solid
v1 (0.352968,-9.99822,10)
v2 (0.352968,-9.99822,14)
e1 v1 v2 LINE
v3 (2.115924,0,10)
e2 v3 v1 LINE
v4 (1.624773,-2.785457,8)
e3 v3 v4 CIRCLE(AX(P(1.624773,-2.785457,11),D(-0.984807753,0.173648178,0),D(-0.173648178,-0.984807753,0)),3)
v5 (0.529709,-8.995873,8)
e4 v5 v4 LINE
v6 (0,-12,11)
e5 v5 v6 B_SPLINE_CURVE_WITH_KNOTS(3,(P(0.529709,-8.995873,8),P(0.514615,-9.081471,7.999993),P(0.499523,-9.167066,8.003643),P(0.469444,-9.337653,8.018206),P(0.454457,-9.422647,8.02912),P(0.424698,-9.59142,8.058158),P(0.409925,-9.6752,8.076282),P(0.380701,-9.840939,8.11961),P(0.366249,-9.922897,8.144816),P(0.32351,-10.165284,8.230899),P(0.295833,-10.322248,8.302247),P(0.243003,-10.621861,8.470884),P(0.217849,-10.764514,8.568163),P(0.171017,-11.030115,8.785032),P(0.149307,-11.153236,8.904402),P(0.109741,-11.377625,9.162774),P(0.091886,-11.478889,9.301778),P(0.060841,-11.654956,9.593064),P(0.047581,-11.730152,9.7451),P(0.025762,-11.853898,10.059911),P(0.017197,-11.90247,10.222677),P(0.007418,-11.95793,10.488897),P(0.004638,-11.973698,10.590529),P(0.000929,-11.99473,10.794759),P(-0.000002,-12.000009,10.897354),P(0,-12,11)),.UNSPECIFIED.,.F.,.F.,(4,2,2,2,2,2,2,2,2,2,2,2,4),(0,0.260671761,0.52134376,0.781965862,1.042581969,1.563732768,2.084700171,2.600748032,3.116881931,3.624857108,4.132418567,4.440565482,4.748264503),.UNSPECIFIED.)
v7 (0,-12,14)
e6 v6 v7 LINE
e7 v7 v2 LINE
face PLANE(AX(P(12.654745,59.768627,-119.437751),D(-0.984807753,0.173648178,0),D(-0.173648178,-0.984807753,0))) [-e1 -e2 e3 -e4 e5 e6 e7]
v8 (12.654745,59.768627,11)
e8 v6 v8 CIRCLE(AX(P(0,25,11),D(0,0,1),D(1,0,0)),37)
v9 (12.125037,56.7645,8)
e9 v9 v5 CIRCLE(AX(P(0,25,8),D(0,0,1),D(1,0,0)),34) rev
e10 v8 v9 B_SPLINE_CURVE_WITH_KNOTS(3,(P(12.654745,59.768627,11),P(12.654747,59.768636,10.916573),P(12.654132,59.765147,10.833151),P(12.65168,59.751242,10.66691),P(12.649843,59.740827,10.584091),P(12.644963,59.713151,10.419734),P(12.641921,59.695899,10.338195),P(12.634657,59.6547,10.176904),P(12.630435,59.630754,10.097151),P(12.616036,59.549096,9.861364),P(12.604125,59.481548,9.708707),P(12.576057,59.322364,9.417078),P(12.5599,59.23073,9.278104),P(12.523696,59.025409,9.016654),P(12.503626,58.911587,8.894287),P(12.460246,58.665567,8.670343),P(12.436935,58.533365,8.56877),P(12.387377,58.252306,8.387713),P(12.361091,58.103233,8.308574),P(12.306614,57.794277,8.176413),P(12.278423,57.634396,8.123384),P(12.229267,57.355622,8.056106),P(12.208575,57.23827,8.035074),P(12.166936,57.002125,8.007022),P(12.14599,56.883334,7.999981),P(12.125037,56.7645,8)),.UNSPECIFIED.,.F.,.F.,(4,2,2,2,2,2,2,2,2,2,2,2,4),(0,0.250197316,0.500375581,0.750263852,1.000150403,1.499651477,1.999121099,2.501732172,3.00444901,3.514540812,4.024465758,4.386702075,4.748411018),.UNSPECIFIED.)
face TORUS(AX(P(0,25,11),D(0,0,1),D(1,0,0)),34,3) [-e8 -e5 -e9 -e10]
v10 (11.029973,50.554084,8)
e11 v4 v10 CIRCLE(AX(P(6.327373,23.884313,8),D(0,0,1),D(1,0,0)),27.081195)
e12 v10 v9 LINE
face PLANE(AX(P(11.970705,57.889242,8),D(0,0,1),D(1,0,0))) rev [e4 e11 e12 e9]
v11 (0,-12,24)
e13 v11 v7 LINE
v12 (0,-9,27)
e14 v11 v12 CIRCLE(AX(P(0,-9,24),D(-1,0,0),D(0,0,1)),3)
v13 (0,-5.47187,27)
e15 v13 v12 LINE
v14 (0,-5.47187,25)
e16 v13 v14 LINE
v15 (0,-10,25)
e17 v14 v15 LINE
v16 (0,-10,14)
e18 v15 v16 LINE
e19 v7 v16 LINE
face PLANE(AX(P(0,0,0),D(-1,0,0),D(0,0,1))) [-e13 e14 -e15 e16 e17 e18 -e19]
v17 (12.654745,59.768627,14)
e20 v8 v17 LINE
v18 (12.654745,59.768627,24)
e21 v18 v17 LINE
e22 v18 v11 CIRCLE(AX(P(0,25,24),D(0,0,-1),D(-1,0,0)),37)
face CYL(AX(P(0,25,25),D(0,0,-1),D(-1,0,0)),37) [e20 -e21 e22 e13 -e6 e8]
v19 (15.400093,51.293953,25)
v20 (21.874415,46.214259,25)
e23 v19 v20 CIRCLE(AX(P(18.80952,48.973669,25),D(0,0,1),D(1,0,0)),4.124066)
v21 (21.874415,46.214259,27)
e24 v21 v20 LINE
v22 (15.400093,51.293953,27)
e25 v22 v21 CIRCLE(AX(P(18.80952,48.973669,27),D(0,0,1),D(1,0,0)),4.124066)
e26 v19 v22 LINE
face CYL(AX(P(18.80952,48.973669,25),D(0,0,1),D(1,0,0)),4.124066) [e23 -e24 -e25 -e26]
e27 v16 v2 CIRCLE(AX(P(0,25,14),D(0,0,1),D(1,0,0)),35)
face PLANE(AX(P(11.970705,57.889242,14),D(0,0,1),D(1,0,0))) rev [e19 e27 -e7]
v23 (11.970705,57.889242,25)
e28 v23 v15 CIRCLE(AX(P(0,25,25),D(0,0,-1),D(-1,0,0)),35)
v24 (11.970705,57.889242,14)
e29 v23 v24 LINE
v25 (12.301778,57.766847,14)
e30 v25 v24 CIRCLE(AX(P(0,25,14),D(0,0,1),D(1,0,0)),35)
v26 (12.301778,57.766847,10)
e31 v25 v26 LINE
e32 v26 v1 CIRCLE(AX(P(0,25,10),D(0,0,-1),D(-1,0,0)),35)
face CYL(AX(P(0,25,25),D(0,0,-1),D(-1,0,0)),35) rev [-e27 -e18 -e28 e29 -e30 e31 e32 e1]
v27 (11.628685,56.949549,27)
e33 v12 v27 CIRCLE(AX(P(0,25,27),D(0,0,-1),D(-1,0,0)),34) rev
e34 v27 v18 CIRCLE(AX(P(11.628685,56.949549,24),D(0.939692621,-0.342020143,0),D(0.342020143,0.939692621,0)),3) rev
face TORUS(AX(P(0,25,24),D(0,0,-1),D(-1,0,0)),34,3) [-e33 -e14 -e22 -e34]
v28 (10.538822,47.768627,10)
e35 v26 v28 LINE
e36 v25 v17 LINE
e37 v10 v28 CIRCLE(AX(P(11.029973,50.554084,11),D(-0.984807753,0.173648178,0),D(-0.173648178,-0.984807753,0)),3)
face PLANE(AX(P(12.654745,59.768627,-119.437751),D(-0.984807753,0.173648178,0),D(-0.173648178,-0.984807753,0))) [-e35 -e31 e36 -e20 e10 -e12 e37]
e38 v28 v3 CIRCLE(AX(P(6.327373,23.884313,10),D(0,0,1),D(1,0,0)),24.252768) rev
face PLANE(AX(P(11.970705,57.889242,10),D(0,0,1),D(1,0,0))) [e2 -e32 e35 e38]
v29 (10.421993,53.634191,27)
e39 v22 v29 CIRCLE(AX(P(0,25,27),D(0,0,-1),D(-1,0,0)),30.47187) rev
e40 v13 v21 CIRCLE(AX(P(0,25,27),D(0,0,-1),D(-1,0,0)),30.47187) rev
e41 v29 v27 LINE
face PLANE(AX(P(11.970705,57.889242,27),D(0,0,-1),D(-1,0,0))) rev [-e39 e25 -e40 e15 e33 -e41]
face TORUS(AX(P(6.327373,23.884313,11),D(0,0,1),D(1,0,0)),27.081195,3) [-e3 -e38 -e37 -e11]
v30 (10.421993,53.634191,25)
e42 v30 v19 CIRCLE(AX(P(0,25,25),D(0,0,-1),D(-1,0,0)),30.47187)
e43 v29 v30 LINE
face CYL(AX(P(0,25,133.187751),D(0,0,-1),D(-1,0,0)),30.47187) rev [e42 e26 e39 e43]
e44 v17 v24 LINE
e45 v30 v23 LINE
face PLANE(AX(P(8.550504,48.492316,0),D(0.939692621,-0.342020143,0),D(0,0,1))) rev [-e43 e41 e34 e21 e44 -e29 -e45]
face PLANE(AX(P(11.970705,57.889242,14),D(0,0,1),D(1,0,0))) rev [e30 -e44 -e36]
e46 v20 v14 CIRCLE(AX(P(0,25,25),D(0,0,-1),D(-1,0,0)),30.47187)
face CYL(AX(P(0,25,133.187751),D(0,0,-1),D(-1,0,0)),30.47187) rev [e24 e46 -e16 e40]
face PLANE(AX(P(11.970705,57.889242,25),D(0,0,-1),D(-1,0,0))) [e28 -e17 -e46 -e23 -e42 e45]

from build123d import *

# Parameters (mm, degrees)
SKETCH1_W                = 15
SKETCH1_H                = 35
REVOLVE1_ANGLE           = 160
SHELL1_T                 = 2
CUT_EXTRUDE4_DEPTH       = 73.816816531
CUT_EXTRUDE4_DEPTH_BACK  = 6
CUT_EXTRUDE5_DEPTH       = 73.816816531
CUT_EXTRUDE5_DEPTH_BACK  = 6
BOSS_EXTRUDE1_START      = -2
SKETCH9_R                = 4.124065783
BOSS_EXTRUDE1_DEPTH      = 2
FILLET4_R                = 3
FILLET5_R                = 3
CUT_EXTRUDE15_DEPTH      = 73.816816664
CUT_EXTRUDE15_DEPTH_BACK = 2
FILLET9_R                = 3


with BuildPart() as part:
    # Sketch1 → Revolve1 (revolve)
    with BuildSketch(Plane(origin=(0, 0, 0), x_dir=(0, 0, -1), z_dir=(1, 0, 0))):
        with Locations((-17.5, 7.5)):
            Rectangle(SKETCH1_W, SKETCH1_H)
    revolve(axis=Axis((0, 25, 25), (0, 0, 1)), revolution_arc=REVOLVE1_ANGLE)

    # Shell1
    shell1_openings = [part.faces().sort_by_distance(p)[0] for p in [
        (0, 7.5, 17.5),
        (5.985352508, 41.444620864, 17.5),
    ]]
    offset(amount=SHELL1_T, openings=shell1_openings, kind=Kind.INTERSECTION)

    # Sketch5 → Cut-Extrude4 (cut, two sides: drawn at the far end of the back side and taken through both)
    with BuildSketch(Plane.XY.offset(27).offset(-CUT_EXTRUDE4_DEPTH_BACK)):
        with BuildLine():
            Line((-139.932865383, 108.358884102), (10.421993206, 53.634190998))
            ThreePointArc((10.421993206, 53.634190998), (30.008933424, 19.708615375), (0, -5.471869593))
            Line((0, -5.471869593), (-160.004298494, -5.471869593))
            Line((-160.004298494, -5.471869593), (-475.151245838, 50.097040112))
            Line((-475.151245838, 50.097040112), (-455.079812728, 163.927793806))
            Line((-455.079812728, 163.927793806), (-139.932865383, 108.358884102))
        make_face()
    extrude(amount=CUT_EXTRUDE4_DEPTH + CUT_EXTRUDE4_DEPTH_BACK, mode=Mode.SUBTRACT)

    # Sketch7 → Cut-Extrude5 (cut, two sides: drawn at the far end of the back side and taken through both)
    with BuildSketch(Plane(origin=(0, 0, 8), x_dir=(-1, 0, 0), z_dir=(0, 0, -1)).offset(-CUT_EXTRUDE5_DEPTH_BACK)):
        Polygon((-42.433629983, 228.653074263), (-12.654745303, 59.768626969), (0, -12), (29.77888468, -180.884447294), (367.547779267, -121.326677934), (295.335264604, 288.210843622), align=None)
    extrude(amount=CUT_EXTRUDE5_DEPTH + CUT_EXTRUDE5_DEPTH_BACK, mode=Mode.SUBTRACT)

    # Sketch9 → Boss-Extrude1 (add)
    with BuildSketch(Plane.XY.offset(27).offset(BOSS_EXTRUDE1_START)):
        with Locations((18.809520277, 48.973668543)):
            Circle(SKETCH9_R)
    extrude(amount=BOSS_EXTRUDE1_DEPTH)

    # Fillet4
    fillet4_edges = [part.edges().sort_by_distance(p)[0] for p in [
        (36.437886861, 18.575017426, 27),
    ]]
    fillet(fillet4_edges, radius=FILLET4_R)

    # Fillet5
    fillet5_edges = [part.edges().sort_by_distance(p)[0] for p in [
        (36.437886861, 18.575017426, 8),
    ]]
    fillet(fillet5_edges, radius=FILLET5_R)

    # Sketch13 → Cut-Extrude15 (cut, two sides: drawn at the far end of the back side and taken through both)
    with BuildSketch(Plane(origin=(0, 0, 8), x_dir=(-1, 0, 0), z_dir=(0, 0, -1)).offset(-CUT_EXTRUDE15_DEPTH_BACK)):
        with BuildLine():
            Line((144.037339106, 25.770763563), (-2.115923769, 0))
            ThreePointArc((-2.115923769, 0), (-30.211686136, 19.672864602), (-10.538821535, 47.768626969))
            Line((-10.538821535, 47.768626969), (135.61444134, 73.539390533))
            Line((135.61444134, 73.539390533), (427.92096709, 125.080917659))
            Line((427.92096709, 125.080917659), (436.343864856, 77.31229069))
            Line((436.343864856, 77.31229069), (144.037339106, 25.770763563))
        make_face()
    extrude(amount=CUT_EXTRUDE15_DEPTH + CUT_EXTRUDE15_DEPTH_BACK, mode=Mode.SUBTRACT)

    # Fillet9
    # the kernel refuses this fillet: 3 mm, written as the material it takes off along each edge
    with BuildSketch(Plane(origin=(6.327372652, 23.884313485, 8), x_dir=(-0.44981568414947964, -0.8931214084843873, 0), z_dir=(-0.8931214084843873, 0.44981568414947964, 0))) as fillet9_piece_1:
        with BuildLine():
            CenterArc((27.081194644, 3), FILLET9_R, 199.471220634, 70.528779366)
            Line((24.252767519, 2), (24.196198976, 1.98))
            ThreePointArc((24.196198976, 1.98), (24.192767519, 1), (24.192767519, 0))
            Line((24.192767519, 0), (24.252767519, -0.06))
            Line((24.252767519, -0.06), (27.081194644, -0.06))
            Line((27.081194644, -0.06), (27.081194644, 0))
        make_face()
    revolve(axis=Axis((6.327372652, 23.884313485, 8), (0, 0, 1)), revolution_arc=213.463718105, mode=Mode.SUBTRACT)


solid = part.part
